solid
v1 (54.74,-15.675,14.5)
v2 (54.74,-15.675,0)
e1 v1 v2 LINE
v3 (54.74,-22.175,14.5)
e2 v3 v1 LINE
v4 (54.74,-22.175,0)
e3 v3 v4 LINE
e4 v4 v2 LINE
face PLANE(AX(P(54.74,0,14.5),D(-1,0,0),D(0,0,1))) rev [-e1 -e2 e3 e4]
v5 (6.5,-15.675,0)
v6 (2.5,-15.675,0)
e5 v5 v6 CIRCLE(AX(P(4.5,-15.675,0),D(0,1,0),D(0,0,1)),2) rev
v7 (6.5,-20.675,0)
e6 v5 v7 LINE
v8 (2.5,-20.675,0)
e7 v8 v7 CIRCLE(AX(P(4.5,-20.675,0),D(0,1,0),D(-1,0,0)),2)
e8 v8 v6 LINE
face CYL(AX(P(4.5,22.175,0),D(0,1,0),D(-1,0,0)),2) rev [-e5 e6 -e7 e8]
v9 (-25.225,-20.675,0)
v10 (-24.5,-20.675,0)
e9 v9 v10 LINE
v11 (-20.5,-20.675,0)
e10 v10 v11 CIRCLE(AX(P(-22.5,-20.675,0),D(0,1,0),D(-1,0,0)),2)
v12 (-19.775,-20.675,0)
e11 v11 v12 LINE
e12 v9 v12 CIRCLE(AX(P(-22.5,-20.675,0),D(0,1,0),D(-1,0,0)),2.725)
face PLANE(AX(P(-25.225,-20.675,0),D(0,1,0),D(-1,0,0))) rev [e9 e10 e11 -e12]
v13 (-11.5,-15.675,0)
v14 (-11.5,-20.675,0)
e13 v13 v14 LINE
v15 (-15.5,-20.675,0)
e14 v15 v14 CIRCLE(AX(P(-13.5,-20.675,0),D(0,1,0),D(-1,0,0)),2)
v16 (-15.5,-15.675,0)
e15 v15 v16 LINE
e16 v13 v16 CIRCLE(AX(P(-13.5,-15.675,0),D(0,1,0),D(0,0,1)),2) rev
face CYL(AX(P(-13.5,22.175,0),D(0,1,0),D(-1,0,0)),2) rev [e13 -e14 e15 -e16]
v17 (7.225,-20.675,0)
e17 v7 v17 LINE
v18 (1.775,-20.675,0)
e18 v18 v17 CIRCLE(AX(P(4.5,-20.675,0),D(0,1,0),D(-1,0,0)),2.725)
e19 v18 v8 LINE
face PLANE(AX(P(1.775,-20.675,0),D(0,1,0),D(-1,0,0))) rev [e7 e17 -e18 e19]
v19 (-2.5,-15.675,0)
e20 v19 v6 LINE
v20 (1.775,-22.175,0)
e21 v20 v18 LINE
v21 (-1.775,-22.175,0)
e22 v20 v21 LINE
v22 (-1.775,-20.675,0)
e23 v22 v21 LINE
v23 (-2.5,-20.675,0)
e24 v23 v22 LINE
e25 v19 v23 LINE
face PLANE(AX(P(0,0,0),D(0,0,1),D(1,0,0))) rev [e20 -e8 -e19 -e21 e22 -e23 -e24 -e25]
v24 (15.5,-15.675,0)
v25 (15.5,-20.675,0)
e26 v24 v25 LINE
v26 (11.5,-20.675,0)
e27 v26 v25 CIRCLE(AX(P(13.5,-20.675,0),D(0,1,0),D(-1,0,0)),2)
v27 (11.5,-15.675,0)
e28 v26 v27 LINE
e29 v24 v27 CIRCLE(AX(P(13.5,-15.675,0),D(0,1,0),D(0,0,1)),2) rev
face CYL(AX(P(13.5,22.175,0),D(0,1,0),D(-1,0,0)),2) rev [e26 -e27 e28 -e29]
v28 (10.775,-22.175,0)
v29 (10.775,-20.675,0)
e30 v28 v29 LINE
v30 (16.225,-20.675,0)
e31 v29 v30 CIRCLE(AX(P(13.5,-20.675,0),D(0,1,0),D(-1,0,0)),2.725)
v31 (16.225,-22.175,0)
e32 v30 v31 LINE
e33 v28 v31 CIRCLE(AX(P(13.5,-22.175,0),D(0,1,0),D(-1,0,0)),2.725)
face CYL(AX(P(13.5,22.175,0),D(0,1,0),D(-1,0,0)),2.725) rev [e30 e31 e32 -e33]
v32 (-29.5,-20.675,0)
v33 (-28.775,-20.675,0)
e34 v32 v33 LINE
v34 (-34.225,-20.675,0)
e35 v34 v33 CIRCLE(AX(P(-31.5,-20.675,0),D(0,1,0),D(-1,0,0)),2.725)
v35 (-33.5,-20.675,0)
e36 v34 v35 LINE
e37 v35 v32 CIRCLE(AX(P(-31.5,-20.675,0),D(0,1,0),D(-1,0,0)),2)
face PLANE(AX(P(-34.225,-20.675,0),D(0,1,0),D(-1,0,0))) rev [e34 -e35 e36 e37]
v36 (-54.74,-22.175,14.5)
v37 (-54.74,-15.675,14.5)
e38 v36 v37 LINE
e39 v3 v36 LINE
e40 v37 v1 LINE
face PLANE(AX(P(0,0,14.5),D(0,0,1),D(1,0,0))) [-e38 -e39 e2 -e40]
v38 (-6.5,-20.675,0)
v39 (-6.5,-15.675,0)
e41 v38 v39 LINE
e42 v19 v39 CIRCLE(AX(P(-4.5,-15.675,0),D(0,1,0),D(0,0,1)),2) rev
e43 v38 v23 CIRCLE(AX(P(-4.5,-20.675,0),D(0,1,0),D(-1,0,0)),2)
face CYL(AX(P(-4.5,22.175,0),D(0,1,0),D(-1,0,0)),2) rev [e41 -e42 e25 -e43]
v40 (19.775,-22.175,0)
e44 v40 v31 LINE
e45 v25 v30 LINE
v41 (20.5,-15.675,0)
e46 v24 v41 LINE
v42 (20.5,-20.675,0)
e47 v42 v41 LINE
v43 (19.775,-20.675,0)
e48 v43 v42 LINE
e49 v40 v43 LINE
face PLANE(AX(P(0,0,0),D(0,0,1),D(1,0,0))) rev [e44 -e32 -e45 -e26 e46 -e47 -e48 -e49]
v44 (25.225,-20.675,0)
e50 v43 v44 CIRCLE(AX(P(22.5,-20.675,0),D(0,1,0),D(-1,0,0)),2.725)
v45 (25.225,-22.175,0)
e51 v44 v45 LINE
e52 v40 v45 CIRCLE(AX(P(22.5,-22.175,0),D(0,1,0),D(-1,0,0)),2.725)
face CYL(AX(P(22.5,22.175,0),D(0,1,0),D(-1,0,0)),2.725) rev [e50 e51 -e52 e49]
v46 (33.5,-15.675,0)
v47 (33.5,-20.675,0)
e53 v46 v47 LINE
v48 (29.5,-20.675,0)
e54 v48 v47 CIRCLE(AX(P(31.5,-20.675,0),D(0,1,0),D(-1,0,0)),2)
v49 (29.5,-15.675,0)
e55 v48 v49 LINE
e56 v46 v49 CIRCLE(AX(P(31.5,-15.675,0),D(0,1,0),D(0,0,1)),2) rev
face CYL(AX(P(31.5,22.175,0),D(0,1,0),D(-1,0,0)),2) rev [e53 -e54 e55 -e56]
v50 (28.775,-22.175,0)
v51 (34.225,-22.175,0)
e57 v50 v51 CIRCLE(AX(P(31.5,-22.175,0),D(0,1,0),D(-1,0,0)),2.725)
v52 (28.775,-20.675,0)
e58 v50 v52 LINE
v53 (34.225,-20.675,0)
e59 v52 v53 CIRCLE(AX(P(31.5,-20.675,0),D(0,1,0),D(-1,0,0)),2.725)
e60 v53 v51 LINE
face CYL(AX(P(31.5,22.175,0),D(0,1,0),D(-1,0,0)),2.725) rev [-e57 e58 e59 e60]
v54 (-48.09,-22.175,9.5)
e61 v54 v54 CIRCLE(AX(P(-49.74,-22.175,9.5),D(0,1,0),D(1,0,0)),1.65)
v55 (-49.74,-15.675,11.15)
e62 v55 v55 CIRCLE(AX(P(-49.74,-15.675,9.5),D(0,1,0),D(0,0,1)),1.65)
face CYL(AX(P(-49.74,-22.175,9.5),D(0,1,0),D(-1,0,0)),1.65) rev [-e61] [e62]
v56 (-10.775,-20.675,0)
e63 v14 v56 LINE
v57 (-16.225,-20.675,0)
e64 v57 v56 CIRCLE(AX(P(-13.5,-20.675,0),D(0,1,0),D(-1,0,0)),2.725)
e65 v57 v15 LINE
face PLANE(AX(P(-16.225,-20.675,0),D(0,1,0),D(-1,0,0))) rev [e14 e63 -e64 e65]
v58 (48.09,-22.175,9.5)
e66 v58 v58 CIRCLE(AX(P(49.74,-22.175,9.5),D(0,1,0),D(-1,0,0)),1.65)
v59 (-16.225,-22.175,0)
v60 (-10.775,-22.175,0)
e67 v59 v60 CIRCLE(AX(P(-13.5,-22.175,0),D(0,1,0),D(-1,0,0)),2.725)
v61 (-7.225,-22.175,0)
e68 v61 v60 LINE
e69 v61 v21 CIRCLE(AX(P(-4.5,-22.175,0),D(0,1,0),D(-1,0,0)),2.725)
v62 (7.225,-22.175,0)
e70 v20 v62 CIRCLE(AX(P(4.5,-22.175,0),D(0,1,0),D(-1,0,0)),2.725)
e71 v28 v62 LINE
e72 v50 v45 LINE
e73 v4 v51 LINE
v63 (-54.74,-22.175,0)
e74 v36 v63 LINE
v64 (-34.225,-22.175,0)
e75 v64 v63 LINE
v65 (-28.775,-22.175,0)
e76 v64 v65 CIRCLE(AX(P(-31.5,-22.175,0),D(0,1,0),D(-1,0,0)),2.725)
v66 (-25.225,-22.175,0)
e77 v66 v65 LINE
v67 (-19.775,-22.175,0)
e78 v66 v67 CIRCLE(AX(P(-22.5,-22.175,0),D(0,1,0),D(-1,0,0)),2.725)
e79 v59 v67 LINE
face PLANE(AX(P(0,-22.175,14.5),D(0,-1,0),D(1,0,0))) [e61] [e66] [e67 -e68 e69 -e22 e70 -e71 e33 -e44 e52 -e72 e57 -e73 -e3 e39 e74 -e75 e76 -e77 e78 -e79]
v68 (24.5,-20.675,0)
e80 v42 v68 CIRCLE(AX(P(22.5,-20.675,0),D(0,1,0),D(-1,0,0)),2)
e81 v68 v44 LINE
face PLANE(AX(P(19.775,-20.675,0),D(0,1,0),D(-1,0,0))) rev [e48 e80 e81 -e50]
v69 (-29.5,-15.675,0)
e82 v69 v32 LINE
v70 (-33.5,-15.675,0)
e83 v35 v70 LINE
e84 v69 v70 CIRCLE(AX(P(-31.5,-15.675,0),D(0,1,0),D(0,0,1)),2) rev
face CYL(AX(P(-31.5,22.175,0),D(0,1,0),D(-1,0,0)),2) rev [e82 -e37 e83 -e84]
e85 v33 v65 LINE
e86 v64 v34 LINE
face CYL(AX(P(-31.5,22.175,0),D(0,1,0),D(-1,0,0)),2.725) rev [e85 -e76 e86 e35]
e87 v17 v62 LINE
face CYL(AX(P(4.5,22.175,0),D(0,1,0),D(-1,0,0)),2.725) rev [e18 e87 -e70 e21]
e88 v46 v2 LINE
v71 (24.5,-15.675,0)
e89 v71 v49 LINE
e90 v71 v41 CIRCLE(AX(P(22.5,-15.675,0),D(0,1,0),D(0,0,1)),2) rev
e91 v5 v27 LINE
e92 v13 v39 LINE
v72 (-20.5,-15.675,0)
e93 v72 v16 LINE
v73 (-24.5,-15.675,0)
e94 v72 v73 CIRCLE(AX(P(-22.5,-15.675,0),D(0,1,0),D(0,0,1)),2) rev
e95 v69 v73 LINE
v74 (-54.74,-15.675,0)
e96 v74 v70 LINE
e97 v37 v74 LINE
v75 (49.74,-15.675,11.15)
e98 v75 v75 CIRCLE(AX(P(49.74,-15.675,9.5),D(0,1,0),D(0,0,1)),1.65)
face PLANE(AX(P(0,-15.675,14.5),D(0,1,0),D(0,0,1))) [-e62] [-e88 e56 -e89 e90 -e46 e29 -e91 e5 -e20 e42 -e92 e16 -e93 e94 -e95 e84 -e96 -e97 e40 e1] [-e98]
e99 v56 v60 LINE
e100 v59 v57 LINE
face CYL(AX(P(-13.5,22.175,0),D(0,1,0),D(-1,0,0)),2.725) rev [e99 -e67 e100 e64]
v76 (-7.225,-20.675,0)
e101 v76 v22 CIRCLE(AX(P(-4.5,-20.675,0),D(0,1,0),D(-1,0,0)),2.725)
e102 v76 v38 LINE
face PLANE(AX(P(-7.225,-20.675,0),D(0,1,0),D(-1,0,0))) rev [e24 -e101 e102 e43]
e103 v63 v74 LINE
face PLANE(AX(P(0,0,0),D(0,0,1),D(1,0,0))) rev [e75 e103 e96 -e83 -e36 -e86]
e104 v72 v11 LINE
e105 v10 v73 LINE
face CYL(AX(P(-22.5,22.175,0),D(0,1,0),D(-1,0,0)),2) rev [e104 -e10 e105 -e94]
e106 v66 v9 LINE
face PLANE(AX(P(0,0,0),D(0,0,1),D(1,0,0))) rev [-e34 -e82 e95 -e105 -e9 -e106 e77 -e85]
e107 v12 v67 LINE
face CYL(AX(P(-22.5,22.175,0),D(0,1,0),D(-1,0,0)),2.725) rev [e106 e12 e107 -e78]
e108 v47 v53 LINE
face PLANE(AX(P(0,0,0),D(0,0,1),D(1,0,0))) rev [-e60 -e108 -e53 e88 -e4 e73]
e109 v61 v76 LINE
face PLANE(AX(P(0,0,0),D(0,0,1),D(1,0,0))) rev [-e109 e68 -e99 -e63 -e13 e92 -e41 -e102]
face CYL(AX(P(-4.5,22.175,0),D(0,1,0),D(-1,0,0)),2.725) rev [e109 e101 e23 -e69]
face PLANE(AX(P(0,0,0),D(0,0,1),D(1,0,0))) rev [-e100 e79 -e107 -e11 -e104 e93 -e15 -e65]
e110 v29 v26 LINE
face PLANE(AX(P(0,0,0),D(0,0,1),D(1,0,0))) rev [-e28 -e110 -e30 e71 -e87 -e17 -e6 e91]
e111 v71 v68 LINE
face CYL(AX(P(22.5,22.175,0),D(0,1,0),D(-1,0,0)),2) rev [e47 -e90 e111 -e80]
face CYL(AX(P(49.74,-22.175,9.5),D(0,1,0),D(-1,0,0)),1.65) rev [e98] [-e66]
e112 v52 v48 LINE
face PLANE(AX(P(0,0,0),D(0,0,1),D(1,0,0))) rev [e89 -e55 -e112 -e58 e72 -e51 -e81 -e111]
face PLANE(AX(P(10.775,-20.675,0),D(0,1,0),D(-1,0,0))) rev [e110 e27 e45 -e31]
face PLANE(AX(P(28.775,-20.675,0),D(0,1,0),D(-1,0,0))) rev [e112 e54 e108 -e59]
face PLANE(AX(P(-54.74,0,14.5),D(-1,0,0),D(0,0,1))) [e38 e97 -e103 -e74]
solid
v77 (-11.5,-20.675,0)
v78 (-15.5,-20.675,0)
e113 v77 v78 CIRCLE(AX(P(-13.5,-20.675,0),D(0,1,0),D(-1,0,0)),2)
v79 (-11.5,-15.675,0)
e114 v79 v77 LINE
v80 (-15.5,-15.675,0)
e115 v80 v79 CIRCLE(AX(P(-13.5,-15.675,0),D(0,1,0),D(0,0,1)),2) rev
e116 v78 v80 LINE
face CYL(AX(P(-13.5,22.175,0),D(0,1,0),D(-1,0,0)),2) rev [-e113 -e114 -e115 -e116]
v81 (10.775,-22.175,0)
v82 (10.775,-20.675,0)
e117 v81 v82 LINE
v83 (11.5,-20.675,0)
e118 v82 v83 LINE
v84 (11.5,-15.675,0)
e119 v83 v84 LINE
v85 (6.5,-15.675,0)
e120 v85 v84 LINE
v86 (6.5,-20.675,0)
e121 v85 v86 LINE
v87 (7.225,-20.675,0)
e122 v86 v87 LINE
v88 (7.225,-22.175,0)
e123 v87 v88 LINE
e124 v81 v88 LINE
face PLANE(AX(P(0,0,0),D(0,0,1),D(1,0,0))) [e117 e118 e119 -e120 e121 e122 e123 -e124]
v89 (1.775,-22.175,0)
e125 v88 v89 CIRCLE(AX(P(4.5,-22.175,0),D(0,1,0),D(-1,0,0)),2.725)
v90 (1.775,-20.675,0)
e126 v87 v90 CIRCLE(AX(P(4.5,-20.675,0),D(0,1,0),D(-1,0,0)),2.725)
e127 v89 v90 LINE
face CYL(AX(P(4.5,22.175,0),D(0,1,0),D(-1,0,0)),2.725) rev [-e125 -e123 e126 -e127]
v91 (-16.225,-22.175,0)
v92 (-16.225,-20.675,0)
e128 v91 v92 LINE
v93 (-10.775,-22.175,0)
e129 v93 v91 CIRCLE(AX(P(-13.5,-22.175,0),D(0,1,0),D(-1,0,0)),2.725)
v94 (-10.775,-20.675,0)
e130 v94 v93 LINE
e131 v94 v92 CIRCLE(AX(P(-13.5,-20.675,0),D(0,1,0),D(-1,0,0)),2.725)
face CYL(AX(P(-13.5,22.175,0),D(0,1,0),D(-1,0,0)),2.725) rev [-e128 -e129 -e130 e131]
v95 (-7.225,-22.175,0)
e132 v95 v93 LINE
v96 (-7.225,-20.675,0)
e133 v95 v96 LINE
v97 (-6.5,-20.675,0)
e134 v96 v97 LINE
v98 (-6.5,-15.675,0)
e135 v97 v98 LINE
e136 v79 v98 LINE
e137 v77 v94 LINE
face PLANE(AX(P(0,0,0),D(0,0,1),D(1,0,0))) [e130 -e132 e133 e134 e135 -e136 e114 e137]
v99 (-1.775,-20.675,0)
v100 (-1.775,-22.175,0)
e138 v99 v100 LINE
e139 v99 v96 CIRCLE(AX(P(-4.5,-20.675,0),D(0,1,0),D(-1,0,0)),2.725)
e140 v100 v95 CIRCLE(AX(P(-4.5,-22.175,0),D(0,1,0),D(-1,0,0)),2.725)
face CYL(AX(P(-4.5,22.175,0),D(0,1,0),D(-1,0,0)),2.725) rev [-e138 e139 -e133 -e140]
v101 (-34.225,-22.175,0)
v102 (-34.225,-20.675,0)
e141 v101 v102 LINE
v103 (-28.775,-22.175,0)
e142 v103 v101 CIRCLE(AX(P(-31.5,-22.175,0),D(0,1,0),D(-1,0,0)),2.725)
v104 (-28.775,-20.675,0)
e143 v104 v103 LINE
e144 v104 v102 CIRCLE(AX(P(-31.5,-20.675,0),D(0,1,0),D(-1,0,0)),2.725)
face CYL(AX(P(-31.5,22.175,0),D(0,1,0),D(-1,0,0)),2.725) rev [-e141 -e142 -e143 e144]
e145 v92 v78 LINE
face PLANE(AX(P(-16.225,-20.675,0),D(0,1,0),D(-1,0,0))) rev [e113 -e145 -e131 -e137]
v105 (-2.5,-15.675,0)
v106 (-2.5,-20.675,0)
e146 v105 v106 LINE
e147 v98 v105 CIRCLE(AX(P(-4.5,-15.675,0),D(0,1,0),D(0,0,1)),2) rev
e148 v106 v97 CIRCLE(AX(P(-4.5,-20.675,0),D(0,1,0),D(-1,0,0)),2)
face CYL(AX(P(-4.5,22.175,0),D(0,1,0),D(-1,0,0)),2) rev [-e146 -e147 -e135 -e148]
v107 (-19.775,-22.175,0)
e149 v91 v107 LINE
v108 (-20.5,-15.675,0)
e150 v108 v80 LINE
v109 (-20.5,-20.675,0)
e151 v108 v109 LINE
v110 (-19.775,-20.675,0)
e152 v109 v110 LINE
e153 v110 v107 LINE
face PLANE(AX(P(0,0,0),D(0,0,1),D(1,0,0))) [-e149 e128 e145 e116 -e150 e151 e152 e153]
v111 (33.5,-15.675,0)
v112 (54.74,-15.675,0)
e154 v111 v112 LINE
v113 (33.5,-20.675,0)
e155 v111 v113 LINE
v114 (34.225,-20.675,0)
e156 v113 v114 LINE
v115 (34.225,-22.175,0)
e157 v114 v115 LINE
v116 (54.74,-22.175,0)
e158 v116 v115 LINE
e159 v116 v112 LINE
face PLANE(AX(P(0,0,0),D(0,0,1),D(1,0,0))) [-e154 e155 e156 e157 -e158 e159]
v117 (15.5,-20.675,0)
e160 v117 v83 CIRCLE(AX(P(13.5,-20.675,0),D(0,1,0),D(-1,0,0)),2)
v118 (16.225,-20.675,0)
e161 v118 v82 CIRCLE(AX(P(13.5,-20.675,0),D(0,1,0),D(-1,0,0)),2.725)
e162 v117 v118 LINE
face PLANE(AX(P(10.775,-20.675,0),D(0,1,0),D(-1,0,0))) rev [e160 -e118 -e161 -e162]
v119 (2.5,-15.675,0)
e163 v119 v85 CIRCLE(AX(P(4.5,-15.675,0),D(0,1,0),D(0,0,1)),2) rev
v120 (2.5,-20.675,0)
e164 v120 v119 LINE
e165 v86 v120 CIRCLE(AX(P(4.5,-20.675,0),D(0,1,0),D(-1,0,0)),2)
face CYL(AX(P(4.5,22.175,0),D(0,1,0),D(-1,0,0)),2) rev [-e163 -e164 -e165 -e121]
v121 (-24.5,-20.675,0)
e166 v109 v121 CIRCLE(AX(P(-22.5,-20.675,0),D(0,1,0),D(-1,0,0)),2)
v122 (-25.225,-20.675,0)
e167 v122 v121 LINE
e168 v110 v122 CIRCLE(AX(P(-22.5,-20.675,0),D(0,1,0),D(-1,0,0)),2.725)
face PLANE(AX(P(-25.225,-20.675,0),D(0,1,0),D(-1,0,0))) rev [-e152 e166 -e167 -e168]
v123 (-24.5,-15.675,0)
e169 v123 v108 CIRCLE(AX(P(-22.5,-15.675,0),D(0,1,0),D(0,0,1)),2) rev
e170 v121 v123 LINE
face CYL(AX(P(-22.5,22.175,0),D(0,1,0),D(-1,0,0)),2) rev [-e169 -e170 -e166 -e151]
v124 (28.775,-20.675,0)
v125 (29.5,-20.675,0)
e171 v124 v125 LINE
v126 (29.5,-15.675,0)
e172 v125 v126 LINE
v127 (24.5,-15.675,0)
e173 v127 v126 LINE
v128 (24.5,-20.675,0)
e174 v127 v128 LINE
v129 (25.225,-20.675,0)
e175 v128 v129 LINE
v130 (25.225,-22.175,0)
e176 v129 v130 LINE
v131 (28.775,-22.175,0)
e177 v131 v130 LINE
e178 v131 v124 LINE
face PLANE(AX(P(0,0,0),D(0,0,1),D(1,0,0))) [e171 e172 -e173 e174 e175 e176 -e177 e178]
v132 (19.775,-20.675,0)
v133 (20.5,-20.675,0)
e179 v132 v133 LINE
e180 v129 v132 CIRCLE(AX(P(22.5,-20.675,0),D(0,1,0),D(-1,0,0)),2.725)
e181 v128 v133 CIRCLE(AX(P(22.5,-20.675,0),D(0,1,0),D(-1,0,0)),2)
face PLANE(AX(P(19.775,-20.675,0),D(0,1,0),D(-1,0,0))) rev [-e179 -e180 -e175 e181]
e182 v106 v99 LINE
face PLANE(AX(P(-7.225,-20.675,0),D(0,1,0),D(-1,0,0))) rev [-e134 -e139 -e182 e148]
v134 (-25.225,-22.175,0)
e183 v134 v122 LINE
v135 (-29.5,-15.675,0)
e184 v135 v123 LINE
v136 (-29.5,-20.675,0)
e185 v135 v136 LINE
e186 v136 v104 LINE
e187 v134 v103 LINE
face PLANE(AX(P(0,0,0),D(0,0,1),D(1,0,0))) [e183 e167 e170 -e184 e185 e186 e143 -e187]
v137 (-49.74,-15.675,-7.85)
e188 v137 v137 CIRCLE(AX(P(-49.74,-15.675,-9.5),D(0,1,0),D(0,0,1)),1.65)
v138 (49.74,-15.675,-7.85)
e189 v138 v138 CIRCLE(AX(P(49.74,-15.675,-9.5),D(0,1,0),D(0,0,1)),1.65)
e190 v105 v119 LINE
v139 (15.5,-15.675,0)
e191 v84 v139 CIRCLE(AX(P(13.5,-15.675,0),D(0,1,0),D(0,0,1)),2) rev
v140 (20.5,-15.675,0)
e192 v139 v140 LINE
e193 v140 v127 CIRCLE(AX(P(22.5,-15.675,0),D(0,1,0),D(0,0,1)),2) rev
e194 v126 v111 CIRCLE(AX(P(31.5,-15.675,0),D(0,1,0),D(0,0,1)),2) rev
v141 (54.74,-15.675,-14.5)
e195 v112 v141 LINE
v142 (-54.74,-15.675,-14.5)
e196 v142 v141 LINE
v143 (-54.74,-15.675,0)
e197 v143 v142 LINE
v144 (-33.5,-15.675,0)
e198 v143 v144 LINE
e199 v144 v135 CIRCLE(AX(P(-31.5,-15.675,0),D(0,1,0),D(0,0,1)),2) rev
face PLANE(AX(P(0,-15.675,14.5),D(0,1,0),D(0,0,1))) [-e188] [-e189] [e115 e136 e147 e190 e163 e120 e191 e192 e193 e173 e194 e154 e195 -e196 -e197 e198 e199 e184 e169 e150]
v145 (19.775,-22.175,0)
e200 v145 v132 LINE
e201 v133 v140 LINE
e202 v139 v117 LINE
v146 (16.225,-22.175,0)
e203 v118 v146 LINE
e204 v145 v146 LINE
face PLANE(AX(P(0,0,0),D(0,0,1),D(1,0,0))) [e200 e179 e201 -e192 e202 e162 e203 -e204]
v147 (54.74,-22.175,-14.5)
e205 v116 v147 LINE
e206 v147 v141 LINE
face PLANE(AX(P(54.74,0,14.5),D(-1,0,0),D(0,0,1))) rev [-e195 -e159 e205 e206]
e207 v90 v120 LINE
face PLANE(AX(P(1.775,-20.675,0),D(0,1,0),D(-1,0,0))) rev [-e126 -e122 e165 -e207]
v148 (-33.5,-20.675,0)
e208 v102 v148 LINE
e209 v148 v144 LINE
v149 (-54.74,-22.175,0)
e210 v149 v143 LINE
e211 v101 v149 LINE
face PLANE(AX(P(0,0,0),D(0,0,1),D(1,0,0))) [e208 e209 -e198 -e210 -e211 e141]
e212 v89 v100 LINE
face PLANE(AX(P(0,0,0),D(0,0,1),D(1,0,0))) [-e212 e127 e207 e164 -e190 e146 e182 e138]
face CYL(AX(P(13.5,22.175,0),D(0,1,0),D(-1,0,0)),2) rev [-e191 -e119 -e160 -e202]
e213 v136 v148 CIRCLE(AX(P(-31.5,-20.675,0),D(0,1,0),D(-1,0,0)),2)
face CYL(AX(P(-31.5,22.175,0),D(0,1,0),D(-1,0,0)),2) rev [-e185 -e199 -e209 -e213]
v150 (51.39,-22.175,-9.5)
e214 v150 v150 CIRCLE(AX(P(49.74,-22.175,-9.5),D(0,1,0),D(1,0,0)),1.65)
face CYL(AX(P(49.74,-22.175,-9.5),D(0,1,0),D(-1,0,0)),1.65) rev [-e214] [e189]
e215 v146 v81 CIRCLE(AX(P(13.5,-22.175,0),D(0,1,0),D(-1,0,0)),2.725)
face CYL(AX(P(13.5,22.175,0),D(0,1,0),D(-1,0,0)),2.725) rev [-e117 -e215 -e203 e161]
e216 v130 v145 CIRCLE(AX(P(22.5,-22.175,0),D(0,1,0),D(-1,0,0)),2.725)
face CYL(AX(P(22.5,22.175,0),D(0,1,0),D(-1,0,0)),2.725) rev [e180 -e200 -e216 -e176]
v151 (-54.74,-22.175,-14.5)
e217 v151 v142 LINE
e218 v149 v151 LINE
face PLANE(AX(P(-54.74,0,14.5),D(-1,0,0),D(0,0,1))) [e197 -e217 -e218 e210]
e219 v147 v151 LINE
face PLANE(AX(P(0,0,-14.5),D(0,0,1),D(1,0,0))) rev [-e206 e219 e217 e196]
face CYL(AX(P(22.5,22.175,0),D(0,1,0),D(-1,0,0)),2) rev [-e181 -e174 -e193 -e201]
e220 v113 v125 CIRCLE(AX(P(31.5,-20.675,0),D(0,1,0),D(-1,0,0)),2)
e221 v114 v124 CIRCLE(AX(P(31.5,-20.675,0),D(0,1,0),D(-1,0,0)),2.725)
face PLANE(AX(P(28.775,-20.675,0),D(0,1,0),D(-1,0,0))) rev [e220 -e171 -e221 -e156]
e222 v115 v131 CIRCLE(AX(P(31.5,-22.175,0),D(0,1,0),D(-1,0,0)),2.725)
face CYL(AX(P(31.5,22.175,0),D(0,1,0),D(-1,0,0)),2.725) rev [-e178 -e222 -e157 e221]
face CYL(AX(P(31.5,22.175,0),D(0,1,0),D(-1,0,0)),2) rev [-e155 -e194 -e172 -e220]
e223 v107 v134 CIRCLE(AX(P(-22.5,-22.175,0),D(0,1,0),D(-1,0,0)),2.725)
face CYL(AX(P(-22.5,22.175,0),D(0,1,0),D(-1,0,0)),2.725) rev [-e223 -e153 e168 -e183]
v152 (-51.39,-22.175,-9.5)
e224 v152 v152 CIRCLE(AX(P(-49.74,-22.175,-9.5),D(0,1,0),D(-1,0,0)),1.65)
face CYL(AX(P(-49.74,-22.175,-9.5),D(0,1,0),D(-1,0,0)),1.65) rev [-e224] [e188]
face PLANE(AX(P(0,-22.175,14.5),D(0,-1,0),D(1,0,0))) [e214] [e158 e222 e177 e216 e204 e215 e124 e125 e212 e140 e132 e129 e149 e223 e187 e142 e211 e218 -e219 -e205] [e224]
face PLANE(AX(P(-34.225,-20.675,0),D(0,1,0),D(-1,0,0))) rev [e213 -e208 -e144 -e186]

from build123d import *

# Parameters (mm, degrees)
STOCK_OPTICAL_UNIT_V3_1_START         = -22.175
STOCK_OPTICAL_UNIT_V3_1_OUTLINE_W     = 109.48
STOCK_OPTICAL_UNIT_V3_1_OUTLINE_H     = 29
STOCK_OPTICAL_UNIT_V3_1_OUTLINE_R     = 1.65
STOCK_OPTICAL_UNIT_V3_1_OUTLINE_R_2   = 2.725
STOCK_OPTICAL_UNIT_V3_1_DEPTH         = 6.5
STOCK_OPTICAL_UNIT_V3_1_START_2       = -20.675
STOCK_OPTICAL_UNIT_V3_1_2_OUTLINE_R   = 2.725
STOCK_OPTICAL_UNIT_V3_1_2_OUTLINE_R_2 = 2
STOCK_OPTICAL_UNIT_V3_1_2_DEPTH       = 5


# Read off the part's stored shape, not the designer's step: Stock-Optical_unit_v3-1
with BuildPart() as part:
    # Stock-Optical_unit_v3-1 outline → Stock-Optical_unit_v3-1 (new body)
    with BuildSketch(Plane(origin=(0, 0, 0), x_dir=(1, 0, 0), z_dir=(0, 1, 0)).offset(STOCK_OPTICAL_UNIT_V3_1_START)):
        Rectangle(STOCK_OPTICAL_UNIT_V3_1_OUTLINE_W, STOCK_OPTICAL_UNIT_V3_1_OUTLINE_H)
        with Locations((-49.74, -9.5)):
            Circle(STOCK_OPTICAL_UNIT_V3_1_OUTLINE_R, mode=Mode.SUBTRACT)
        with Locations((49.74, -9.5)):
            Circle(STOCK_OPTICAL_UNIT_V3_1_OUTLINE_R, mode=Mode.SUBTRACT)
        with Locations((-31.5, 0)):
            Circle(STOCK_OPTICAL_UNIT_V3_1_OUTLINE_R_2, mode=Mode.SUBTRACT)
        with Locations((-22.5, 0)):
            Circle(STOCK_OPTICAL_UNIT_V3_1_OUTLINE_R_2, mode=Mode.SUBTRACT)
        with Locations((-13.5, 0)):
            Circle(STOCK_OPTICAL_UNIT_V3_1_OUTLINE_R_2, mode=Mode.SUBTRACT)
        with Locations((-4.5, 0)):
            Circle(STOCK_OPTICAL_UNIT_V3_1_OUTLINE_R_2, mode=Mode.SUBTRACT)
        with Locations((-49.74, 9.5)):
            Circle(STOCK_OPTICAL_UNIT_V3_1_OUTLINE_R, mode=Mode.SUBTRACT)
        with Locations((4.5, 0)):
            Circle(STOCK_OPTICAL_UNIT_V3_1_OUTLINE_R_2, mode=Mode.SUBTRACT)
        with Locations((13.5, 0)):
            Circle(STOCK_OPTICAL_UNIT_V3_1_OUTLINE_R_2, mode=Mode.SUBTRACT)
        with Locations((22.5, 0)):
            Circle(STOCK_OPTICAL_UNIT_V3_1_OUTLINE_R_2, mode=Mode.SUBTRACT)
        with Locations((31.5, 0)):
            Circle(STOCK_OPTICAL_UNIT_V3_1_OUTLINE_R_2, mode=Mode.SUBTRACT)
        with Locations((49.74, 9.5)):
            Circle(STOCK_OPTICAL_UNIT_V3_1_OUTLINE_R, mode=Mode.SUBTRACT)
    extrude(amount=STOCK_OPTICAL_UNIT_V3_1_DEPTH)

    # Stock-Optical_unit_v3-1 2 outline → Stock-Optical_unit_v3-1 2 (add)
    # profile 1 of 8: a face of its own
    with BuildSketch(Plane(origin=(0, 0, 0), x_dir=(1, 0, 0), z_dir=(0, 1, 0)).offset(STOCK_OPTICAL_UNIT_V3_1_START_2)):
        with Locations((31.5, 0)):
            Circle(STOCK_OPTICAL_UNIT_V3_1_2_OUTLINE_R)
        with Locations((31.5, 0)):
            Circle(STOCK_OPTICAL_UNIT_V3_1_2_OUTLINE_R_2, mode=Mode.SUBTRACT)
    # profile 2 of 8: a face of its own
    with BuildSketch(Plane(origin=(0, 0, 0), x_dir=(1, 0, 0), z_dir=(0, 1, 0)).offset(STOCK_OPTICAL_UNIT_V3_1_START_2)):
        with Locations((22.5, 0)):
            Circle(STOCK_OPTICAL_UNIT_V3_1_2_OUTLINE_R)
        with Locations((22.5, 0)):
            Circle(STOCK_OPTICAL_UNIT_V3_1_2_OUTLINE_R_2, mode=Mode.SUBTRACT)
    # profile 3 of 8: a face of its own
    with BuildSketch(Plane(origin=(0, 0, 0), x_dir=(1, 0, 0), z_dir=(0, 1, 0)).offset(STOCK_OPTICAL_UNIT_V3_1_START_2)):
        with Locations((13.5, 0)):
            Circle(STOCK_OPTICAL_UNIT_V3_1_2_OUTLINE_R)
        with Locations((13.5, 0)):
            Circle(STOCK_OPTICAL_UNIT_V3_1_2_OUTLINE_R_2, mode=Mode.SUBTRACT)
    # profile 4 of 8: a face of its own
    with BuildSketch(Plane(origin=(0, 0, 0), x_dir=(1, 0, 0), z_dir=(0, 1, 0)).offset(STOCK_OPTICAL_UNIT_V3_1_START_2)):
        with Locations((4.5, 0)):
            Circle(STOCK_OPTICAL_UNIT_V3_1_2_OUTLINE_R)
        with Locations((4.5, 0)):
            Circle(STOCK_OPTICAL_UNIT_V3_1_2_OUTLINE_R_2, mode=Mode.SUBTRACT)
    # profile 5 of 8: a face of its own
    with BuildSketch(Plane(origin=(0, 0, 0), x_dir=(1, 0, 0), z_dir=(0, 1, 0)).offset(STOCK_OPTICAL_UNIT_V3_1_START_2)):
        with Locations((-4.5, 0)):
            Circle(STOCK_OPTICAL_UNIT_V3_1_2_OUTLINE_R)
        with Locations((-4.5, 0)):
            Circle(STOCK_OPTICAL_UNIT_V3_1_2_OUTLINE_R_2, mode=Mode.SUBTRACT)
    # profile 6 of 8: a face of its own
    with BuildSketch(Plane(origin=(0, 0, 0), x_dir=(1, 0, 0), z_dir=(0, 1, 0)).offset(STOCK_OPTICAL_UNIT_V3_1_START_2)):
        with Locations((-13.5, 0)):
            Circle(STOCK_OPTICAL_UNIT_V3_1_2_OUTLINE_R)
        with Locations((-13.5, 0)):
            Circle(STOCK_OPTICAL_UNIT_V3_1_2_OUTLINE_R_2, mode=Mode.SUBTRACT)
    # profile 7 of 8: a face of its own
    with BuildSketch(Plane(origin=(0, 0, 0), x_dir=(1, 0, 0), z_dir=(0, 1, 0)).offset(STOCK_OPTICAL_UNIT_V3_1_START_2)):
        with Locations((-22.5, 0)):
            Circle(STOCK_OPTICAL_UNIT_V3_1_2_OUTLINE_R)
        with Locations((-22.5, 0)):
            Circle(STOCK_OPTICAL_UNIT_V3_1_2_OUTLINE_R_2, mode=Mode.SUBTRACT)
    # profile 8 of 8: a face of its own
    with BuildSketch(Plane(origin=(0, 0, 0), x_dir=(1, 0, 0), z_dir=(0, 1, 0)).offset(STOCK_OPTICAL_UNIT_V3_1_START_2)):
        with Locations((-31.5, 0)):
            Circle(STOCK_OPTICAL_UNIT_V3_1_2_OUTLINE_R)
        with Locations((-31.5, 0)):
            Circle(STOCK_OPTICAL_UNIT_V3_1_2_OUTLINE_R_2, mode=Mode.SUBTRACT)
    extrude(amount=STOCK_OPTICAL_UNIT_V3_1_2_DEPTH)


with BuildPart() as body_2:
    # Split1: the piece on the far side of the plane
    add(part.part)
    split(bisect_by=Plane.XY, keep=Keep.BOTTOM)


with BuildPart() as part_1:
    add(part.part)

    # Split1
    split(bisect_by=Plane.XY, keep=Keep.TOP)


solid = Compound([body_2.part, part_1.part])
